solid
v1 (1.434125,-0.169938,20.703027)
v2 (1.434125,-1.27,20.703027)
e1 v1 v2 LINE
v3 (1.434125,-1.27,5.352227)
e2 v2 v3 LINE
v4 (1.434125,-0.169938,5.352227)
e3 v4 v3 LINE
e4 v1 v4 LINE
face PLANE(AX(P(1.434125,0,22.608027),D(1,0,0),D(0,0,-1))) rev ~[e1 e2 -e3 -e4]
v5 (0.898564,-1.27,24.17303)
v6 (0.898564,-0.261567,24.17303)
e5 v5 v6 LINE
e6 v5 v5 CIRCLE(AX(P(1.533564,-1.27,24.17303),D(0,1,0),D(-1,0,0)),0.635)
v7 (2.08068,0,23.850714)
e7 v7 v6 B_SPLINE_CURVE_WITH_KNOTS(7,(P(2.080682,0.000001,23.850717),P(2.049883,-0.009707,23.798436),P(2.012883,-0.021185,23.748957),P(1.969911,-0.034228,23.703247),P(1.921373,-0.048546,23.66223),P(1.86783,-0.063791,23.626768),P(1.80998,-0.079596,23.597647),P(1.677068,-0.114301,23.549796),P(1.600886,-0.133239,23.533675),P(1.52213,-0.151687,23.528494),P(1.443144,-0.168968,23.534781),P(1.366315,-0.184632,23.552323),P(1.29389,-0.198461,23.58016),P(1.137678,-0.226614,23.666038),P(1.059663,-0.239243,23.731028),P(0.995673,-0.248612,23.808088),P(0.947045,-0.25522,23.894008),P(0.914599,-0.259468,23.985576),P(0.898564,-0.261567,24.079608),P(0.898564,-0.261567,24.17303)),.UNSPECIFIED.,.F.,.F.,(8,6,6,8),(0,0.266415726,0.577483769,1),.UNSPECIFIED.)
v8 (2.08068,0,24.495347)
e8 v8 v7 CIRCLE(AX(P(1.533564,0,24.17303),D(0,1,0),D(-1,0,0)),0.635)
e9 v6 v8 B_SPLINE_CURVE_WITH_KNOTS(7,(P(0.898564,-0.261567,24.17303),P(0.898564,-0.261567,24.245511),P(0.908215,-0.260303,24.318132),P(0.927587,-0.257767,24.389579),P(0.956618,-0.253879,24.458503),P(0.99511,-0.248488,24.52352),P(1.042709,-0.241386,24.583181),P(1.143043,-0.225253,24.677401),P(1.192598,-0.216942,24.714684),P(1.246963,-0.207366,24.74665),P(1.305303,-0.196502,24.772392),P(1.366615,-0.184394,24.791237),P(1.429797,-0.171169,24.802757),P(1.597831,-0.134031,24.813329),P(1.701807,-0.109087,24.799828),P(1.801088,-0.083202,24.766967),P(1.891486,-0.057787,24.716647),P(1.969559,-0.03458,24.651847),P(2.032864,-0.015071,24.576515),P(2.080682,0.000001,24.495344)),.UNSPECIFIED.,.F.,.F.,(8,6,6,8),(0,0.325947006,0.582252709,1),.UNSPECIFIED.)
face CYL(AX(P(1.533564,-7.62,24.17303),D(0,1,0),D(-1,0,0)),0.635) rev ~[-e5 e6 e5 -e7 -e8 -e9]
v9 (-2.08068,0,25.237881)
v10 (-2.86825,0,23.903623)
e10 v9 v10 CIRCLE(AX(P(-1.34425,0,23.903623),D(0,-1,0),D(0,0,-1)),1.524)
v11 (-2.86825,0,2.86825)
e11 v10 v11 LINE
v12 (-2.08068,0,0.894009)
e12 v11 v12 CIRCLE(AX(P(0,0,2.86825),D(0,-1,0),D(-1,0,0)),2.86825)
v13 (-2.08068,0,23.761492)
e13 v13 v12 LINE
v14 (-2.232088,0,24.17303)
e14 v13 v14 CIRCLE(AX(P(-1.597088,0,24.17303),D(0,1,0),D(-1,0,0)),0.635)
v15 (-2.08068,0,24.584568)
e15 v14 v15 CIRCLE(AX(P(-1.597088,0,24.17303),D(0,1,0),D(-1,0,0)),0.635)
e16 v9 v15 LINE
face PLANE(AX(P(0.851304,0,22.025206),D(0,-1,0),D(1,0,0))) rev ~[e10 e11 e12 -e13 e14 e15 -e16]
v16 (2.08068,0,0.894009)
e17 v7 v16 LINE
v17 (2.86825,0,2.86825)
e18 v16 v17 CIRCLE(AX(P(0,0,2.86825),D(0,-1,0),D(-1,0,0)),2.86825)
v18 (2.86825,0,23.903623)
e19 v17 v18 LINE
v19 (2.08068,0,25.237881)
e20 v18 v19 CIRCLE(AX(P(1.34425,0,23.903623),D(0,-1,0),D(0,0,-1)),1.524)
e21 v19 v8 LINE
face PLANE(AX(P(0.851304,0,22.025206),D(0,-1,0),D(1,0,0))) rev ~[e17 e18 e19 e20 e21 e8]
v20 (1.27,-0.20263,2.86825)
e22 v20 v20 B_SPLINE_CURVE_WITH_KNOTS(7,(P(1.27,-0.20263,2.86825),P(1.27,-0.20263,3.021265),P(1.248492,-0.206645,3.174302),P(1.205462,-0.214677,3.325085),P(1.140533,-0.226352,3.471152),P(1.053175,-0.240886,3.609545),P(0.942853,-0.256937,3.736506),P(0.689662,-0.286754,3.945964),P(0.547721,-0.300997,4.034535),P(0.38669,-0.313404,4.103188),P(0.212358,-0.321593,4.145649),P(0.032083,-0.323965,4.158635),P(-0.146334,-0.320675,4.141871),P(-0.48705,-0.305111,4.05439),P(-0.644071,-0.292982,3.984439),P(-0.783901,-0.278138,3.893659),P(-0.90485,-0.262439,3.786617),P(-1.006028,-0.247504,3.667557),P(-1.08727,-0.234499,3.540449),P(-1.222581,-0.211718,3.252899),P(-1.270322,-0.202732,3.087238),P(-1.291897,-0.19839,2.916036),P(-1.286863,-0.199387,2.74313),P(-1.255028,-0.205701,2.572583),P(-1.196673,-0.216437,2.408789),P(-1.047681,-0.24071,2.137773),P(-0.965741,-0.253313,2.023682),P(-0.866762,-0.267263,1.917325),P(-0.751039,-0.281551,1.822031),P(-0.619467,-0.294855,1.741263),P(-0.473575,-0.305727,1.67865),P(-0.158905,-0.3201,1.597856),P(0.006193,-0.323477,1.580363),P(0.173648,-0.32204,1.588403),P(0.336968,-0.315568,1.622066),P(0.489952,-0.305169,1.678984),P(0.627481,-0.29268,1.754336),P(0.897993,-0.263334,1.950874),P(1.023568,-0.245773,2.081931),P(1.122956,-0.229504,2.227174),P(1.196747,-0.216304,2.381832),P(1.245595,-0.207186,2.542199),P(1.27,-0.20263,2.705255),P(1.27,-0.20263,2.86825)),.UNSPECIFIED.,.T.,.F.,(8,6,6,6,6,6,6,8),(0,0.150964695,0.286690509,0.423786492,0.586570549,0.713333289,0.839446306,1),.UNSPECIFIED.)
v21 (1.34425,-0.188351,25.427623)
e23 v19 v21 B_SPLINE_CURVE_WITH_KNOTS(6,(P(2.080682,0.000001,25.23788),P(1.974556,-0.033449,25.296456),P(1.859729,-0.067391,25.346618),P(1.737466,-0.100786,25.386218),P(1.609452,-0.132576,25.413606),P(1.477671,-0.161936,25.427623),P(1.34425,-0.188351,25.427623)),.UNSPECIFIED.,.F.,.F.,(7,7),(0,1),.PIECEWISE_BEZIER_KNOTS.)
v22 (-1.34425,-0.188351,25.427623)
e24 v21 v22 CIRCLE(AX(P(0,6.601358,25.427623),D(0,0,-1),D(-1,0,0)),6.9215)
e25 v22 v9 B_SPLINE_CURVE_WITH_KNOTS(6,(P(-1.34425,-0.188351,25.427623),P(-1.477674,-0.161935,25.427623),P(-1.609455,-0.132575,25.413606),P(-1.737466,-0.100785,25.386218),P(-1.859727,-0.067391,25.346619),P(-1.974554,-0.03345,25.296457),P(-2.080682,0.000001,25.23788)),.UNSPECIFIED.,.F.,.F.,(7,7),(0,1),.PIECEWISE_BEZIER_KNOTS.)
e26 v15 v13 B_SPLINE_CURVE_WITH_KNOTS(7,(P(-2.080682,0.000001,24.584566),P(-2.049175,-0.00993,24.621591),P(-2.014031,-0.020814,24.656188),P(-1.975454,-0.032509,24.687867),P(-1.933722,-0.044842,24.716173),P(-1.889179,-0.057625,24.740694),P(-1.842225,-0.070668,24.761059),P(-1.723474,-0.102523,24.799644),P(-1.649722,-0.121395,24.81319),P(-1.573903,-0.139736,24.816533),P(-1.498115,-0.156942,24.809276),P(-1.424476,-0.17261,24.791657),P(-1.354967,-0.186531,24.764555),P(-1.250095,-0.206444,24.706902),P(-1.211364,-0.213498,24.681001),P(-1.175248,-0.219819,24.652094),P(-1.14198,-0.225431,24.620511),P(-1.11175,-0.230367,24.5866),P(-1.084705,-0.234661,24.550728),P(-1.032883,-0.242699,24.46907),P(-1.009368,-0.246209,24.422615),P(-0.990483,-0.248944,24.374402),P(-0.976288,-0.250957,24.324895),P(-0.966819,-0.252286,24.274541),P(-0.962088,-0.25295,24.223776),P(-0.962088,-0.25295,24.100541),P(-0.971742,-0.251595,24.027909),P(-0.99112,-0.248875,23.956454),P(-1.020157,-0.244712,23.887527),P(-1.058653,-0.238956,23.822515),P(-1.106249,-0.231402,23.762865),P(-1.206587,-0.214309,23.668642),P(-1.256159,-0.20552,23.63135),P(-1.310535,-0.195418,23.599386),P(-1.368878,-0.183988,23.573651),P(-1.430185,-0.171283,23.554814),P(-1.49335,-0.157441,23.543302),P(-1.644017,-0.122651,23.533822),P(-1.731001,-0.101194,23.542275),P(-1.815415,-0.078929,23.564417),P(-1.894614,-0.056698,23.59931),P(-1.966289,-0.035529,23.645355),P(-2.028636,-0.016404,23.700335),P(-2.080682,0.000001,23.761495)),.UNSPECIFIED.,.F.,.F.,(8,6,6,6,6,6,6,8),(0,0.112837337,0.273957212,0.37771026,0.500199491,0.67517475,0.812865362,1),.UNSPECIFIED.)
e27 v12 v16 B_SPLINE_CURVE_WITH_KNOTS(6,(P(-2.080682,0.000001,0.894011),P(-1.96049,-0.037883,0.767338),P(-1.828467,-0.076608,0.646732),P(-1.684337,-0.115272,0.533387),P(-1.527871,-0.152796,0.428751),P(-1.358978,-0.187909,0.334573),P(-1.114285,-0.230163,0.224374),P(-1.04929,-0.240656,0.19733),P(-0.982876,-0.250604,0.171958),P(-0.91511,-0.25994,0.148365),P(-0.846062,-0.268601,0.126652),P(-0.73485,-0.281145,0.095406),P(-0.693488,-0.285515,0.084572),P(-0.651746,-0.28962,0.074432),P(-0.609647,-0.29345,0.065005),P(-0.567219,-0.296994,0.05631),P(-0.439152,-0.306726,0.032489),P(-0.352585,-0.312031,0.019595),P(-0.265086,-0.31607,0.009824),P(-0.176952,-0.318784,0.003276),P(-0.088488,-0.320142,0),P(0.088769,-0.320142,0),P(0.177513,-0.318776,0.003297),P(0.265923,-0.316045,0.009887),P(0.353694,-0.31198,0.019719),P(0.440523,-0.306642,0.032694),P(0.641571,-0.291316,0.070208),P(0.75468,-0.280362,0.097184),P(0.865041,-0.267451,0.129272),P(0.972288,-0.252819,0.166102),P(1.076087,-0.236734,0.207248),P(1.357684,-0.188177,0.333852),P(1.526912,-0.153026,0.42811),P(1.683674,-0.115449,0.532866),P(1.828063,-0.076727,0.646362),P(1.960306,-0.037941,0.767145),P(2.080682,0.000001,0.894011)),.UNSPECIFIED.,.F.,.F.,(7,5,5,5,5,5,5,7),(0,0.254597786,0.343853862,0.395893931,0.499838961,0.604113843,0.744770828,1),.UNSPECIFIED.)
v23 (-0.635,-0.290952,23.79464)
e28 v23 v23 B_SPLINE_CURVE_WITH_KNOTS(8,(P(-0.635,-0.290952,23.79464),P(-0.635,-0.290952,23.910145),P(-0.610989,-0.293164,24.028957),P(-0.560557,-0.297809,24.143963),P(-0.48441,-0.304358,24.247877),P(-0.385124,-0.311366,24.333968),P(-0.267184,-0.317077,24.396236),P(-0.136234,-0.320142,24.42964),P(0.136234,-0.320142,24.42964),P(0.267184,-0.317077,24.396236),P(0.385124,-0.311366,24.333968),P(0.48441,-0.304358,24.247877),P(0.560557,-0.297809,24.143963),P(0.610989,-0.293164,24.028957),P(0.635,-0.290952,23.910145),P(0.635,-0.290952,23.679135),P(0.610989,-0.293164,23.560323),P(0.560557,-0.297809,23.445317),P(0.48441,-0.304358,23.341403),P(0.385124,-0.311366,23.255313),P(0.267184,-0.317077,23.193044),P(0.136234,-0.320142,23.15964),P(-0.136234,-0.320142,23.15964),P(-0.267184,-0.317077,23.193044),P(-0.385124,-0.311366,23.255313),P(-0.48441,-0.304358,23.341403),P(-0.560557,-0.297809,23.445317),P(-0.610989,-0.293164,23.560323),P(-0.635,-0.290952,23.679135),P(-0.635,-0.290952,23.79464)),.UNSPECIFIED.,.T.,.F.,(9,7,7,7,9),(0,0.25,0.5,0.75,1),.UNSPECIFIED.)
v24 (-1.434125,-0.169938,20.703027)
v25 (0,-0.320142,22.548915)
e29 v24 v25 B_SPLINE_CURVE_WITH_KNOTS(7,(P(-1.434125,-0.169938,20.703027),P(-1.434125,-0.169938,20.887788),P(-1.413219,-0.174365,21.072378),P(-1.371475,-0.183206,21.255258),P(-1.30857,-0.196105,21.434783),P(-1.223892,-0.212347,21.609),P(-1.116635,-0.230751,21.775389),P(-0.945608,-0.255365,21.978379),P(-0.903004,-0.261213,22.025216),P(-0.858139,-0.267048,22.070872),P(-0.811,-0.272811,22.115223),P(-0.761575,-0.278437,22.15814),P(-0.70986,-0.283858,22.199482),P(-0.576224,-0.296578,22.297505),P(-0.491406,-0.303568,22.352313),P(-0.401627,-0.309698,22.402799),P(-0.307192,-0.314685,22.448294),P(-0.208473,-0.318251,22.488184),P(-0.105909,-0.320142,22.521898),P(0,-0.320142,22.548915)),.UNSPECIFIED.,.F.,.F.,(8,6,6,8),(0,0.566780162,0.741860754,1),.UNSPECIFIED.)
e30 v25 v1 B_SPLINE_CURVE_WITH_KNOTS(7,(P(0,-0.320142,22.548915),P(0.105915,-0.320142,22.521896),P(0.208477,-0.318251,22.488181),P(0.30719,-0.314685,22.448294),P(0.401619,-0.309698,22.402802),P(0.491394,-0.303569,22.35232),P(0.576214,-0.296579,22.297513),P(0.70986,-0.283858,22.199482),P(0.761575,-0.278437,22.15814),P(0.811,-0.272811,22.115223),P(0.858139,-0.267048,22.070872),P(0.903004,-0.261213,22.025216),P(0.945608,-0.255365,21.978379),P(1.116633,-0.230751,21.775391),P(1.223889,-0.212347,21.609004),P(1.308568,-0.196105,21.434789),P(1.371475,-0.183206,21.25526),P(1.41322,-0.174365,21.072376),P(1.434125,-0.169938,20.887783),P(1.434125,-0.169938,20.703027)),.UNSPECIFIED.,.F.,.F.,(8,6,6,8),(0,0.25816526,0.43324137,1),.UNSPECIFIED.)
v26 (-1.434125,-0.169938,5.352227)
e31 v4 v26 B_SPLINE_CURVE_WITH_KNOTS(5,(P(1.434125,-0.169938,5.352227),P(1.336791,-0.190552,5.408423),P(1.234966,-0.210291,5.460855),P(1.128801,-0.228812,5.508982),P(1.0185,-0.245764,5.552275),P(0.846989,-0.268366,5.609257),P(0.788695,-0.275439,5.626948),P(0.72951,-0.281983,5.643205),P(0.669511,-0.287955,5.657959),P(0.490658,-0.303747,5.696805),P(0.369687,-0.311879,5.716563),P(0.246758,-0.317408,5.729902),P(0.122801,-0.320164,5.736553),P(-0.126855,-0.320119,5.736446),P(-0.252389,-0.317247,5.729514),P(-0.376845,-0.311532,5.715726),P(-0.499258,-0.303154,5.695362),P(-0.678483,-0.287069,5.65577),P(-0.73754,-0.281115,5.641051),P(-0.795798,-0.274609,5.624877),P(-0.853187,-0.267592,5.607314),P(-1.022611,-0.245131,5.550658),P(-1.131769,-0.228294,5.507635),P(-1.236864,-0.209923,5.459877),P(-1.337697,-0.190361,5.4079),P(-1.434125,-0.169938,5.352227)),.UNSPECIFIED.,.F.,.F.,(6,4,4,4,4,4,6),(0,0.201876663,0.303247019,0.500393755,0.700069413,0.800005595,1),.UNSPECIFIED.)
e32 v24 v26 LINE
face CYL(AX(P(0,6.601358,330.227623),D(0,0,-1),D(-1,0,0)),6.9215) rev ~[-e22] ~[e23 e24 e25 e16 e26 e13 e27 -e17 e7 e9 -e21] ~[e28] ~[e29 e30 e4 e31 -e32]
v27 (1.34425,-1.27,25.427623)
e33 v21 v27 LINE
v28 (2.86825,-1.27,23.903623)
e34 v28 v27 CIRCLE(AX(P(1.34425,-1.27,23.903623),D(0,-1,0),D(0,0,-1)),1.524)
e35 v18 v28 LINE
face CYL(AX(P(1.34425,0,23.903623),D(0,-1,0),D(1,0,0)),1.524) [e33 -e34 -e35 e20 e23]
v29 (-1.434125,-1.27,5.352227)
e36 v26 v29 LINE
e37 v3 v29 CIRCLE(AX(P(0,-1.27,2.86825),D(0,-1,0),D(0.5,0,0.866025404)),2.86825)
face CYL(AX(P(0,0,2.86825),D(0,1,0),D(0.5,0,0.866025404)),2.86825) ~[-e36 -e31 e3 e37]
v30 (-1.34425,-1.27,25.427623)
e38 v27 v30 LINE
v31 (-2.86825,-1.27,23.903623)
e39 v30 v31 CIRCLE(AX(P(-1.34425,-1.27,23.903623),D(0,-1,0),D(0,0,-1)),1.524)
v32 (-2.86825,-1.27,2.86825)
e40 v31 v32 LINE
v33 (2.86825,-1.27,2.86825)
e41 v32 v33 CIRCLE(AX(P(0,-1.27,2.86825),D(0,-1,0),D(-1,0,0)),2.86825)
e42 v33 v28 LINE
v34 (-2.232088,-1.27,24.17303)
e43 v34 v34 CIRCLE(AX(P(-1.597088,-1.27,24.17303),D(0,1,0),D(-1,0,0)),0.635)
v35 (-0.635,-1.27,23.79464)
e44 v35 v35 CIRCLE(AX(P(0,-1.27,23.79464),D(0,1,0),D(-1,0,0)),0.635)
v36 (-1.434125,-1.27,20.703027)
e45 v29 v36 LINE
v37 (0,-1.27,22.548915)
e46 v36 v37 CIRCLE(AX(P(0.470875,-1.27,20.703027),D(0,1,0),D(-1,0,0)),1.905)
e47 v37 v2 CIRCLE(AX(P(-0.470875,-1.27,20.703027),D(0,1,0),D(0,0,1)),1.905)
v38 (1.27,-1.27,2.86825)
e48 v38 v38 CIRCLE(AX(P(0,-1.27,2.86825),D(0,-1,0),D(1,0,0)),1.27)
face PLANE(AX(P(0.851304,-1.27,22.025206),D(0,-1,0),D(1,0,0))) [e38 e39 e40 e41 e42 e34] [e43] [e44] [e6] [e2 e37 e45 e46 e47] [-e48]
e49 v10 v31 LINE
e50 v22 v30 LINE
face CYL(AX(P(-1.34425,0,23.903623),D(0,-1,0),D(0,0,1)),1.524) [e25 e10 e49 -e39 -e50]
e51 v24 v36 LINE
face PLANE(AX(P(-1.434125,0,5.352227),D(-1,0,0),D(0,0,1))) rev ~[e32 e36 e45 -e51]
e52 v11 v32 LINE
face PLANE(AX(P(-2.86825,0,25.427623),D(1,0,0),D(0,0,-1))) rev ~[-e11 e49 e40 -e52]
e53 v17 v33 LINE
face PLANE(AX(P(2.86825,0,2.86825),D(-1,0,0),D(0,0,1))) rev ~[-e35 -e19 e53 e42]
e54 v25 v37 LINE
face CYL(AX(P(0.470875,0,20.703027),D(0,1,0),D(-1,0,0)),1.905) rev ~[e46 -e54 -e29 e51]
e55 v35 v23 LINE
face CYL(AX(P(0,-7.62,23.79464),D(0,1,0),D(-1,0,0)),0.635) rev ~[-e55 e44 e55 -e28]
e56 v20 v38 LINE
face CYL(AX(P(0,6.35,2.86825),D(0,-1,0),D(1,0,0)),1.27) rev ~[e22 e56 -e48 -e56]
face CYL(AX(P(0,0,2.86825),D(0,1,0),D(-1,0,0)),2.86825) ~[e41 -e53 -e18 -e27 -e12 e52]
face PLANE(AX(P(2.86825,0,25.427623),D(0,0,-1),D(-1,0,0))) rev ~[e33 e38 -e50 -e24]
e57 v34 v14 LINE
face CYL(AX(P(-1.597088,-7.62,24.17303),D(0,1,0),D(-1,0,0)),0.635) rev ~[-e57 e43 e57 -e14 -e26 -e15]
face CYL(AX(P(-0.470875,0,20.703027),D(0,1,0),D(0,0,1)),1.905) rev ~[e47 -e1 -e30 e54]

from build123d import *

# Parameters (mm, degrees)
F1_DEPTH    = 1.27
F3_D        = 2.54
F3_DEPTH    = 6.35
F3_TIP      = 0.7630929862
F4_R        = 1.524
F6_D        = 1.27
F6_DEPTH    = 6.35
F6_TIP      = 0.3815464931
F7_T1_DEPTH = 1.27
F9_D        = 13.843
F9_DEPTH    = 304.8
F9_TIP      = 4.1588567746


# Not quite as in the source:
# - a fillet or chamfer that OpenCascade refuses, or shapes differently, is made with other operations: its cross-section is extruded or revolved along the edge and cut away or added


with BuildPart() as f1:
    # F0 (on Front) → F1 (new body)
    with BuildSketch(Plane.XZ):
        with BuildLine():
            ThreePointArc((1.4341250062, 5.3522273875), (2.4839773751, 4.3023750186), (2.8682500124, 2.8682500124))
            Line((2.8682500124, 2.8682500124), (2.8682500124, 25.4276227206))
            Line((2.8682500124, 25.4276227206), (0, 25.4276227206))
            Line((0, 25.4276227206), (-1.4341250062, 25.4276227206))
            Line((-1.4341250062, 25.4276227206), (-2.8682500124, 25.4276227206))
            Line((-2.8682500124, 25.4276227206), (-2.8682500124, 2.8682500124))
            ThreePointArc((-2.8682500124, 2.8682500124), (-2.4839773751, 4.3023750186), (-1.4341250062, 5.3522273875))
            Line((-1.4341250062, 5.3522273875), (-1.4341250062, 22.6080268621))
            Line((-1.4341250062, 22.6080268621), (1.4341250062, 22.6080268621))
            Line((1.4341250062, 22.6080268621), (1.4341250062, 5.3522273875))
        make_face()
        with BuildLine():
            ThreePointArc((-2.8682500124, 2.8682500124), (0, 0), (2.8682500124, 2.8682500124))
            ThreePointArc((2.8682500124, 2.8682500124), (2.4839773751, 4.3023750186), (1.4341250062, 5.3522273875))
            ThreePointArc((1.4341250062, 5.3522273875), (0, 5.7365000248), (-1.4341250062, 5.3522273875))
            ThreePointArc((-1.4341250062, 5.3522273875), (-2.4839773751, 4.3023750186), (-2.8682500124, 2.8682500124))
        make_face()
    extrude(amount=F1_DEPTH)

    # F3
    with Locations(Plane(origin=(0, 0, 0), x_dir=(-1, 0, 0), z_dir=(0, 1, 0))):
        with Locations((0, 2.8682500124)):
            Hole(F3_D / 2, depth=F3_DEPTH)
            with Locations((0, 0, -(F3_DEPTH + F3_TIP / 2))):  # 118° drill point
                Cone(0, F3_D / 2, F3_TIP, mode=Mode.SUBTRACT)

    # F4
    f4_edges = [f1.edges().sort_by_distance(p)[0] for p in [
        (2.86825, -0.635, 25.427623),
        (-2.86825, -0.635, 25.427623),
    ]]
    fillet(f4_edges, radius=F4_R)

    # F6
    with Locations(Plane.XZ.offset(1.27)):
        with Locations((-1.5970880988, 24.1730304042), (0, 23.7946401586), (1.5335635452, 24.1730304042)):
            Hole(F6_D / 2, depth=F6_DEPTH)
            with Locations((0, 0, -(F6_DEPTH + F6_TIP / 2))):  # 118° drill point
                Cone(0, F6_D / 2, F6_TIP, mode=Mode.SUBTRACT)

    # F7: fillet of radius 1.905 on 2 edges, made by hand

    # F7_s2 → F7_t1 (join)
    with BuildSketch(Plane.XZ):
        with BuildLine():
            ThreePointArc((-0.4708749938, 22.6080268621), (0.8761634244, 22.0500652803), (1.4341250062, 20.7030268621))
            Line((1.4341250062, 20.7030268621), (1.4341250062, 22.6080268621))
            Line((1.4341250062, 22.6080268621), (-0.4708749938, 22.6080268621))
        make_face()
        with BuildLine():
            ThreePointArc((-1.4341250062, 20.7030268621), (-0.8761634244, 22.0500652803), (0.4708749938, 22.6080268621))
            Line((0.4708749938, 22.6080268621), (-1.4341250062, 22.6080268621))
            Line((-1.4341250062, 22.6080268621), (-1.4341250062, 20.7030268621))
        make_face()
    extrude(amount=F7_T1_DEPTH)

    # F9
    with Locations(Plane.XY.offset(25.4276227206)):
        with Locations((0, 6.6013582982)):
            Hole(F9_D / 2, depth=F9_DEPTH)
            with Locations((0, 0, -(F9_DEPTH + F9_TIP / 2))):  # 118° drill point
                Cone(0, F9_D / 2, F9_TIP, mode=Mode.SUBTRACT)


solid = f1.part
